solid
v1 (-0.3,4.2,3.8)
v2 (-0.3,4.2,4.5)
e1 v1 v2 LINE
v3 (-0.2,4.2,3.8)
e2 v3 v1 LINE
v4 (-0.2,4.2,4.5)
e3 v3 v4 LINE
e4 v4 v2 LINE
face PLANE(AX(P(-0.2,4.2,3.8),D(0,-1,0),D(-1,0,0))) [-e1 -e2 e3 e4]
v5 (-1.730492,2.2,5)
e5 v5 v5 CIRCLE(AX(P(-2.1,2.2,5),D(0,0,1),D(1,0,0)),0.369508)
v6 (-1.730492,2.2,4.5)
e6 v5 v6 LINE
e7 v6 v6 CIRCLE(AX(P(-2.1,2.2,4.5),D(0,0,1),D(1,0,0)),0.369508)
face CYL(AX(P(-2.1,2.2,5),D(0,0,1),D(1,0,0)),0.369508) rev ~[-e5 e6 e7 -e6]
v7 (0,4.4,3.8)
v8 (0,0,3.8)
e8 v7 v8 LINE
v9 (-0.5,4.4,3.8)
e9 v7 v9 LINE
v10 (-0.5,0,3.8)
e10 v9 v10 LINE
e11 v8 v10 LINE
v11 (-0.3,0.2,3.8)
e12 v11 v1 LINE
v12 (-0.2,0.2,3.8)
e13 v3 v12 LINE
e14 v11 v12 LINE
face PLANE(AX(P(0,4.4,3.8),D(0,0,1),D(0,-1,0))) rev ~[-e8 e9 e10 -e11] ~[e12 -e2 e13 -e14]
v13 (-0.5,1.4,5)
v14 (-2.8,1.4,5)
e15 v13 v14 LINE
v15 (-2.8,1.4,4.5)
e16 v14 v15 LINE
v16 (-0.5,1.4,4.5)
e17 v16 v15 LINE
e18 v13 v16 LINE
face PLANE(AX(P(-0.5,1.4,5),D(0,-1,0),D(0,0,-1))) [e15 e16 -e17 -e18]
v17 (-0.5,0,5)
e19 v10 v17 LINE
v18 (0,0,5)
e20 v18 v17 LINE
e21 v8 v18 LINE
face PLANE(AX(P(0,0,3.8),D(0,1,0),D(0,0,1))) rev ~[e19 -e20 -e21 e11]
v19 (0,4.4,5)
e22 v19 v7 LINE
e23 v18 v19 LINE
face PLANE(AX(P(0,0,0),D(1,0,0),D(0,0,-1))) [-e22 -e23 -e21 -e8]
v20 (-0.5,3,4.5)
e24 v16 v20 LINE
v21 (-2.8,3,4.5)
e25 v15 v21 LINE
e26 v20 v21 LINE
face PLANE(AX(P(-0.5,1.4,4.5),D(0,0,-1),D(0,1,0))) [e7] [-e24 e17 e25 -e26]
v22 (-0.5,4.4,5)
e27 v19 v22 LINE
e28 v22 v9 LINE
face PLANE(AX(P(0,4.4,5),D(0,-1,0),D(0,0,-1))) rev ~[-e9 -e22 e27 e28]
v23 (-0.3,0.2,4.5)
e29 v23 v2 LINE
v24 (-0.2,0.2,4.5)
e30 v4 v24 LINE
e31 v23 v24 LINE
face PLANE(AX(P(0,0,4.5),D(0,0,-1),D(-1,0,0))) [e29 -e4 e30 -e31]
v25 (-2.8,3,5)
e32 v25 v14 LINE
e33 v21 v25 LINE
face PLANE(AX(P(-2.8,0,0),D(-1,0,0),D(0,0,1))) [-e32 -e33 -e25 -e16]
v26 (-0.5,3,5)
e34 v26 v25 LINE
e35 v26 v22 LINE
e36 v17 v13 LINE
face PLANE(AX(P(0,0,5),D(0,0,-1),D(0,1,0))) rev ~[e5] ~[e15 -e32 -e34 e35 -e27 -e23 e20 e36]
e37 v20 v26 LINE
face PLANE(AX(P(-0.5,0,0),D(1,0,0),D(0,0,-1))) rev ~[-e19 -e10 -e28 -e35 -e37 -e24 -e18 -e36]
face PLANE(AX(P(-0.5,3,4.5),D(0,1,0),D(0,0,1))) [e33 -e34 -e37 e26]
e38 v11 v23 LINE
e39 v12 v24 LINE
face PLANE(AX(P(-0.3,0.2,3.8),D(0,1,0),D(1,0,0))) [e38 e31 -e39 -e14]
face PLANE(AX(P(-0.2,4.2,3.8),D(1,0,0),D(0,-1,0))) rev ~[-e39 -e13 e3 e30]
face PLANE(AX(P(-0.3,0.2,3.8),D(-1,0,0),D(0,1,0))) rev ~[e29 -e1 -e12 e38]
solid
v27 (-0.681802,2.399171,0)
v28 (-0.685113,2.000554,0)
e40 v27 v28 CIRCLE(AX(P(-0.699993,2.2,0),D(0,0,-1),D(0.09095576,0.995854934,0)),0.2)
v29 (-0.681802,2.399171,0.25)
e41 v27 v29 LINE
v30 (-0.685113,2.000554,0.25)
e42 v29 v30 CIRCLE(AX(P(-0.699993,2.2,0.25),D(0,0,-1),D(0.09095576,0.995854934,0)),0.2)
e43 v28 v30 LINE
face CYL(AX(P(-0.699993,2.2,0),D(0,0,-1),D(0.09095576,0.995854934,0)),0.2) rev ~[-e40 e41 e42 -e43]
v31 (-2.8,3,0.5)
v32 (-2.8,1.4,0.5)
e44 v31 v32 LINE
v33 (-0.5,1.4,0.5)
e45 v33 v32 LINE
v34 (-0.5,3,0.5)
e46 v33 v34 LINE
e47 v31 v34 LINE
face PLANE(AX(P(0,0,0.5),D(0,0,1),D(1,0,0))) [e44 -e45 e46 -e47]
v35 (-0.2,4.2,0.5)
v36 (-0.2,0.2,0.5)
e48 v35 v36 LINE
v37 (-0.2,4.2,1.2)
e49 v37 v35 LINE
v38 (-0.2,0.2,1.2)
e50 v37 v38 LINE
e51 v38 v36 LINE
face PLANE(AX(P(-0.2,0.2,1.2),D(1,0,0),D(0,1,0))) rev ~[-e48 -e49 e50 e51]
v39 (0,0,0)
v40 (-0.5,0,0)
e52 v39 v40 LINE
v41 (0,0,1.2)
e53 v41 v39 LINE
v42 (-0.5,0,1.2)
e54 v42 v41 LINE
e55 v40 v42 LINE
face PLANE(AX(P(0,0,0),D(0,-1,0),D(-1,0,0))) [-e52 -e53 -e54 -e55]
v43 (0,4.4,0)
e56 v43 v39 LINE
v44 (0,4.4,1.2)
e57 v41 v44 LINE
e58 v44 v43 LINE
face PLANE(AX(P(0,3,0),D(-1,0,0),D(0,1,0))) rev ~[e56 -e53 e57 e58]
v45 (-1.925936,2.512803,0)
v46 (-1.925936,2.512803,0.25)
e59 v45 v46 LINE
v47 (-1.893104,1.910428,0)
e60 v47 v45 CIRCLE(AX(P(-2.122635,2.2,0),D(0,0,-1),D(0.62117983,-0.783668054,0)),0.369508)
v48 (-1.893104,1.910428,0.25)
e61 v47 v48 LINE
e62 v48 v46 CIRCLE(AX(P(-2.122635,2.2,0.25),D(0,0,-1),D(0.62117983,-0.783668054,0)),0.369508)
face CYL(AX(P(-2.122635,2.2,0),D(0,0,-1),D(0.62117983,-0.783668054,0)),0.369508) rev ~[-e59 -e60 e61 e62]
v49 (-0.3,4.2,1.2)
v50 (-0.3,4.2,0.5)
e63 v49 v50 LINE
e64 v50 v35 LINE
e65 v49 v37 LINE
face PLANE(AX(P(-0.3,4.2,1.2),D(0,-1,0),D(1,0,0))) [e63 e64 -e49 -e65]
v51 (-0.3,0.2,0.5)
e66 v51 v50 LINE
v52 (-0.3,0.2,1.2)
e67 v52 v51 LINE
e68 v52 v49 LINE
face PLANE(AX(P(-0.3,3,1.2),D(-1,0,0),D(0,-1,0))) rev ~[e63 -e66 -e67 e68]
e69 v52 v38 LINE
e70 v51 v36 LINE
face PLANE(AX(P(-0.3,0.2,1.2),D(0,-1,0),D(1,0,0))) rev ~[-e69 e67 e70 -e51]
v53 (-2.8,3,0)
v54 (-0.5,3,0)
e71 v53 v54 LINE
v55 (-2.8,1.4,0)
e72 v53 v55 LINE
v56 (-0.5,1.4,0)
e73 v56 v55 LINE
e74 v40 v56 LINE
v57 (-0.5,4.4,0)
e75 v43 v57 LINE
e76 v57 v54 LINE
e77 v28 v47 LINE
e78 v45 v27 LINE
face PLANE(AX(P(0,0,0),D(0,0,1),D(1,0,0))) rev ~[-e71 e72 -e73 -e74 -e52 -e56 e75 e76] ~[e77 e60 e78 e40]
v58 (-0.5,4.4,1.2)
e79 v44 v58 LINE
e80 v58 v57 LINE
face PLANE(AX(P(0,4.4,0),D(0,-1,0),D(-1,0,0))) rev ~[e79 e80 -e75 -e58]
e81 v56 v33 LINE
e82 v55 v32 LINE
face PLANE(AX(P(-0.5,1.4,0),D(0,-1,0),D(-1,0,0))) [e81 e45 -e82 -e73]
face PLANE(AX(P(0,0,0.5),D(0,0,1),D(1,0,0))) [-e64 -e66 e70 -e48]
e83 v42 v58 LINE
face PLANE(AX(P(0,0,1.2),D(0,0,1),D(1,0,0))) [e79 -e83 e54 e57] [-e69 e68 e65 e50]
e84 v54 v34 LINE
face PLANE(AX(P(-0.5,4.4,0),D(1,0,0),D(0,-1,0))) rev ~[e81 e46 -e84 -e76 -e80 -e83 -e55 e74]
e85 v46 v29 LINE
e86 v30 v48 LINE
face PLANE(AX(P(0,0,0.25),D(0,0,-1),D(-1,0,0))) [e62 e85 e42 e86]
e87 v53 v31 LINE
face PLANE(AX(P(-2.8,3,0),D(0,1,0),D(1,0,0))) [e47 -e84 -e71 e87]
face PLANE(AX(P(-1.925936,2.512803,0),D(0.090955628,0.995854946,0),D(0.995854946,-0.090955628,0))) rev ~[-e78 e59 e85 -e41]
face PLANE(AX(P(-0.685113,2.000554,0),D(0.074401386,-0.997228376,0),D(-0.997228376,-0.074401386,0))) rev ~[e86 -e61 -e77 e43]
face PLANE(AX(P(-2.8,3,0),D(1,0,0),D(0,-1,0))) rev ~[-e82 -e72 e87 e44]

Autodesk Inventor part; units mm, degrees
ref_plane "YZ Plane" through (0, 0, 0) normal (1, 0, 0) x (0, 1, 0)
ref_plane "XZ Plane" through (0, 0, 0) normal (0, 1, 0) x (-1, 0, 0)
ref_plane "XY Plane" through (0, 0, 0) normal (0, 0, 1) x (1, 0, 0)
sketch "Boceto8" plane through (0, 0, 0) normal (0, 0, 1) x (1, 0, 0)
  line L0 (-2.8, 3) -> (-0.5, 3)
  line L1 (-0.5, 1.4) -> (-2.8, 1.4)
  line L2 (-2.8, 3) -> (-2.8, 1.4)
  line L3 (0, 3) -> (0, 0)
  line L4 (0, 0) -> (-0.5, 0)
  line L5 (-0.5, 0) -> (-0.5, 1.4)
  line L6 (0, 3) -> (0, 4.4)
  line L7 (0, 4.4) -> (-0.5, 4.4)
  line L8 (-0.5, 4.4) -> (-0.5, 3)
extrude "Extrusión8" add sketch "Boceto8" along normal blind 0.5
sketch "Boceto9" plane through (0, 0, 0.5) normal (0, 0, 1) x (1, 0, 0)
  line L0 (-0.5, 3) -> (-2.8, 3) projected
  line L1 (-2.8, 3) -> (-2.8, 1.4) projected
  line L2 (-2.8, 1.4) -> (-0.5, 1.4) projected
  line L3 (-0.5, 1.4) -> (-0.5, 0) projected
  line L4 (-0.5, 0) -> (0, 0) projected
  line L5 (0, 0) -> (0, 4.4) projected
  line L6 (0, 4.4) -> (-0.5, 4.4) projected
  line L7 (-0.5, 4.4) -> (-0.5, 3) projected
  line L8 (0, 4.4) -> (0, 0) projected
  line L9 (-0.5, 4.4) -> (0, 4.4)
  line L10 (0, 4.4) -> (0, 0)
  line L11 (0, 0) -> (-0.5, 0)
  line L12 (-0.5, 0) -> (-0.5, 4.4)
extrude "Extrusión9" add sketch "Boceto9" along normal blind 0.7 contours L7 L6 L5 L4 L3 L12
sketch "Boceto10" plane through (0, 0, 0) normal (0, 0, -1) x (-1, 0, 0)
  line L0 (2.8, 3) -> (0.5, 3)
  line L1 (0.5, 3) -> (0.5, 4.4)
  line L2 (0.5, 4.4) -> (0, 4.4)
  line L3 (0, 4.4) -> (0, 0)
  line L4 (0, 0) -> (0.5, 0)
  line L5 (0.5, 0) -> (0.5, 1.4)
  line L6 (0.5, 1.4) -> (2.8, 1.4)
  line L7 (2.8, 1.4) -> (2.8, 3)
  arc A0 (1.893104, 1.910428) -> (1.925936, 2.512803) centre (2.122635, 2.2) ccw
  line L8 (0.685113, 2.000554) -> (1.893104, 1.910428)
  line L9 (0.681802, 2.399171) -> (1.925936, 2.512803)
  arc A1 (0.681802, 2.399171) -> (0.685113, 2.000554) centre (0.699993, 2.2) ccw
  line L10 (2.8, 1.4) -> (0.499993, 1.4)
  line L11 (0.499993, 3) -> (2.8, 3)
  line L12 (2.8, 1.4) -> (2.8, 3)
  line L13 (-0.000007, 1.4) -> (-0.000007, 4.4)
  line L14 (-0.000007, 4.4) -> (0.499993, 4.4)
  line L15 (0.499993, 4.4) -> (0.499993, 3)
  line L16 (-0.000007, 1.4) -> (-0.000007, 0)
  line L17 (-0.000007, 0) -> (0.499993, 0)
  line L18 (0.499993, 0) -> (0.499993, 1.4)
  line L19 (0.299993, 1.4) -> (0.299993, 4.2)
  line L20 (0.299993, 4.2) -> (0.199993, 4.2)
  line L21 (0.199993, 4.2) -> (0.199993, 1.4)
  line L22 (0.299993, 1.4) -> (0.299993, 0.2)
  line L23 (0.299993, 0.2) -> (0.199993, 0.2)
  line L24 (0.199993, 0.2) -> (0.199993, 1.4)
  line L25 (0.499993, 1.4) -> (0.499993, 3)
sketch "Boceto10 outline for Extrusión10" plane through (0, 0, 0) normal (0, 0, -1) x (-1, 0, 0)
  line L0 (0.685113, 2.000554) -> (1.893104, 1.910428)
  arc A0 (0.681802, 2.399171) -> (0.685113, 2.000554) centre (0.699993, 2.2) ccw
  line L1 (1.925936, 2.512803) -> (0.681802, 2.399171)
  arc A1 (1.893104, 1.910428) -> (1.925936, 2.512803) centre (2.122635, 2.2) ccw
extrude "Extrusión10" cut sketch "Boceto10 outline for Extrusión10" against normal blind 0.25
sketch "Boceto11" plane through (0, 0, 1.2) normal (0, 0, 1) x (1, 0, 0)
  line L0 (0, 0) -> (0, 4.4)
  line L1 (0, 4.4) -> (-0.5, 4.4)
  line L2 (-0.5, 4.4) -> (-0.5, 0)
  line L3 (-0.5, 0) -> (0, 0)
  arc A0 (-1.893111, 2.489572) -> (-1.925943, 1.887197) centre (-2.122641, 2.2) ccw
  line L4 (-0.68512, 2.399446) -> (-1.893111, 2.489572)
  line L5 (-0.681809, 2.000829) -> (-1.925943, 1.887197)
  arc A1 (-0.681809, 2.000829) -> (-0.68512, 2.399446) centre (-0.7, 2.2) ccw
  line L6 (-2.800007, 3) -> (-0.5, 3)
  line L7 (-0.5, 1.4) -> (-2.800007, 1.4)
  line L8 (-2.800007, 3) -> (-2.800007, 1.4)
  line L9 (0, 3) -> (0, 0)
  line L10 (0, 0) -> (-0.5, 0)
  line L11 (-0.5, 0) -> (-0.5, 1.4)
  line L12 (0, 3) -> (0, 4.4)
  line L13 (0, 4.4) -> (-0.5, 4.4)
  line L14 (-0.5, 4.4) -> (-0.5, 3)
  line L15 (-0.3, 3) -> (-0.3, 0.2)
  line L16 (-0.3, 0.2) -> (-0.2, 0.2)
  line L17 (-0.2, 0.2) -> (-0.2, 3)
  line L18 (-0.3, 3) -> (-0.3, 4.2)
  line L19 (-0.3, 4.2) -> (-0.2, 4.2)
  line L20 (-0.2, 4.2) -> (-0.2, 3)
  line L21 (-0.5, 3) -> (-0.5, 1.4)
extrude "Extrusión11" cut sketch "Boceto11" against normal blind 0.7 contours L18 L19 L20 L17 L16 L15
sketch "Boceto12" plane through (0, 0, 0) normal (1, 0, 0) x (0, 0, -1)
  line L0 (-5, 4.4) -> (-3.8, 4.4)
  line L1 (-3.8, 0) -> (-5, 0)
  line L2 (-5, 0) -> (-5, 4.4)
  line L3 (-5, 4.4) -> (-3.8, 4.4)
  line L4 (-3.8, 4.4) -> (-3.8, 0)
  point P0 (-0.5, 0.2)
  point P1 (0, 4.4)
extrude "Extrusión12" add sketch "Boceto12" against normal blind 0.5
sketch "Boceto13" plane through (-0.5, 0, 0) normal (-1, 0, 0) x (0, 0, 1)
  line L0 (0, 1.4) -> (0, 3) projected
  line L1 (0, 1.4) -> (0.5, 1.4) projected
  line L2 (0.5, 3) -> (0.5, 1.4) projected
  line L3 (0, 3) -> (0.5, 3) projected
  line L4 (0, 3) -> (0.5, 3)
  line L5 (0.5, 3) -> (0.5, 1.4)
  line L6 (0.5, 1.4) -> (0, 1.4)
  line L7 (0, 1.4) -> (0, 3)
  line L8 (4.5, 3) -> (5, 3)
  line L9 (5, 3) -> (5, 1.4)
  line L10 (5, 1.4) -> (4.5, 1.4)
  line L11 (4.5, 1.4) -> (4.5, 3)
  point P0 (0, 0)
extrude "Extrusión13" add sketch "Boceto13" along normal blind 2.3 contours L8 L9 L10 L11
sketch "Boceto14" plane through (0, 0, 3.8) normal (0, 0, -1) x (-1, 0, 0)
  line L0 (0.2, 4.2) -> (0.2, 0.2) projected
  line L1 (0.3, 0.2) -> (0.3, 4.2) projected
  line L2 (0.2, 4.2) -> (0.3, 4.2)
  line L3 (0.3, 4.2) -> (0.3, 0.2)
  line L4 (0.3, 0.2) -> (0.2, 0.2)
  line L5 (0.2, 0.2) -> (0.2, 4.2)
  point P0 (0, 0)
extrude "Extrusión14" cut sketch "Boceto14" against normal blind 0.7
sketch "Boceto15" plane through (0, 0, 5) normal (0, 0, 1) x (1, 0, 0)
  circle A0 centre (-2.1, 2.2) radius 0.369508
  line L0 (-2.8, 3) -> (-0.5, 3)
  line L1 (-0.5, 1.4) -> (-2.8, 1.4)
  line L2 (-2.8, 3) -> (-2.8, 1.4)
  line L3 (0, 3) -> (0, 0)
  line L4 (0, 0) -> (-0.5, 0)
  line L5 (-0.5, 0) -> (-0.5, 1.4)
  line L6 (0, 3) -> (0, 4.4)
  line L7 (0, 4.4) -> (-0.5, 4.4)
  line L8 (-0.5, 4.4) -> (-0.5, 3)
  line L9 (0, 4.4) -> (0, 0)
  line L10 (0, 4.4) -> (-0.5, 4.4)
  line L11 (-0.5, 3) -> (-0.5, 4.4)
  line L12 (-0.5, 3) -> (-2.8, 3)
  line L13 (-2.8, 1.4) -> (-2.8, 3)
  line L14 (-0.5, 1.4) -> (-2.8, 1.4)
  line L15 (-0.5, 0) -> (-0.5, 1.4)
  line L16 (0, 0) -> (-0.5, 0)
extrude "Extrusión15" cut sketch "Boceto15" against normal blind 0.9 contours A0
properties part number "learnbotAgarreCamara"
